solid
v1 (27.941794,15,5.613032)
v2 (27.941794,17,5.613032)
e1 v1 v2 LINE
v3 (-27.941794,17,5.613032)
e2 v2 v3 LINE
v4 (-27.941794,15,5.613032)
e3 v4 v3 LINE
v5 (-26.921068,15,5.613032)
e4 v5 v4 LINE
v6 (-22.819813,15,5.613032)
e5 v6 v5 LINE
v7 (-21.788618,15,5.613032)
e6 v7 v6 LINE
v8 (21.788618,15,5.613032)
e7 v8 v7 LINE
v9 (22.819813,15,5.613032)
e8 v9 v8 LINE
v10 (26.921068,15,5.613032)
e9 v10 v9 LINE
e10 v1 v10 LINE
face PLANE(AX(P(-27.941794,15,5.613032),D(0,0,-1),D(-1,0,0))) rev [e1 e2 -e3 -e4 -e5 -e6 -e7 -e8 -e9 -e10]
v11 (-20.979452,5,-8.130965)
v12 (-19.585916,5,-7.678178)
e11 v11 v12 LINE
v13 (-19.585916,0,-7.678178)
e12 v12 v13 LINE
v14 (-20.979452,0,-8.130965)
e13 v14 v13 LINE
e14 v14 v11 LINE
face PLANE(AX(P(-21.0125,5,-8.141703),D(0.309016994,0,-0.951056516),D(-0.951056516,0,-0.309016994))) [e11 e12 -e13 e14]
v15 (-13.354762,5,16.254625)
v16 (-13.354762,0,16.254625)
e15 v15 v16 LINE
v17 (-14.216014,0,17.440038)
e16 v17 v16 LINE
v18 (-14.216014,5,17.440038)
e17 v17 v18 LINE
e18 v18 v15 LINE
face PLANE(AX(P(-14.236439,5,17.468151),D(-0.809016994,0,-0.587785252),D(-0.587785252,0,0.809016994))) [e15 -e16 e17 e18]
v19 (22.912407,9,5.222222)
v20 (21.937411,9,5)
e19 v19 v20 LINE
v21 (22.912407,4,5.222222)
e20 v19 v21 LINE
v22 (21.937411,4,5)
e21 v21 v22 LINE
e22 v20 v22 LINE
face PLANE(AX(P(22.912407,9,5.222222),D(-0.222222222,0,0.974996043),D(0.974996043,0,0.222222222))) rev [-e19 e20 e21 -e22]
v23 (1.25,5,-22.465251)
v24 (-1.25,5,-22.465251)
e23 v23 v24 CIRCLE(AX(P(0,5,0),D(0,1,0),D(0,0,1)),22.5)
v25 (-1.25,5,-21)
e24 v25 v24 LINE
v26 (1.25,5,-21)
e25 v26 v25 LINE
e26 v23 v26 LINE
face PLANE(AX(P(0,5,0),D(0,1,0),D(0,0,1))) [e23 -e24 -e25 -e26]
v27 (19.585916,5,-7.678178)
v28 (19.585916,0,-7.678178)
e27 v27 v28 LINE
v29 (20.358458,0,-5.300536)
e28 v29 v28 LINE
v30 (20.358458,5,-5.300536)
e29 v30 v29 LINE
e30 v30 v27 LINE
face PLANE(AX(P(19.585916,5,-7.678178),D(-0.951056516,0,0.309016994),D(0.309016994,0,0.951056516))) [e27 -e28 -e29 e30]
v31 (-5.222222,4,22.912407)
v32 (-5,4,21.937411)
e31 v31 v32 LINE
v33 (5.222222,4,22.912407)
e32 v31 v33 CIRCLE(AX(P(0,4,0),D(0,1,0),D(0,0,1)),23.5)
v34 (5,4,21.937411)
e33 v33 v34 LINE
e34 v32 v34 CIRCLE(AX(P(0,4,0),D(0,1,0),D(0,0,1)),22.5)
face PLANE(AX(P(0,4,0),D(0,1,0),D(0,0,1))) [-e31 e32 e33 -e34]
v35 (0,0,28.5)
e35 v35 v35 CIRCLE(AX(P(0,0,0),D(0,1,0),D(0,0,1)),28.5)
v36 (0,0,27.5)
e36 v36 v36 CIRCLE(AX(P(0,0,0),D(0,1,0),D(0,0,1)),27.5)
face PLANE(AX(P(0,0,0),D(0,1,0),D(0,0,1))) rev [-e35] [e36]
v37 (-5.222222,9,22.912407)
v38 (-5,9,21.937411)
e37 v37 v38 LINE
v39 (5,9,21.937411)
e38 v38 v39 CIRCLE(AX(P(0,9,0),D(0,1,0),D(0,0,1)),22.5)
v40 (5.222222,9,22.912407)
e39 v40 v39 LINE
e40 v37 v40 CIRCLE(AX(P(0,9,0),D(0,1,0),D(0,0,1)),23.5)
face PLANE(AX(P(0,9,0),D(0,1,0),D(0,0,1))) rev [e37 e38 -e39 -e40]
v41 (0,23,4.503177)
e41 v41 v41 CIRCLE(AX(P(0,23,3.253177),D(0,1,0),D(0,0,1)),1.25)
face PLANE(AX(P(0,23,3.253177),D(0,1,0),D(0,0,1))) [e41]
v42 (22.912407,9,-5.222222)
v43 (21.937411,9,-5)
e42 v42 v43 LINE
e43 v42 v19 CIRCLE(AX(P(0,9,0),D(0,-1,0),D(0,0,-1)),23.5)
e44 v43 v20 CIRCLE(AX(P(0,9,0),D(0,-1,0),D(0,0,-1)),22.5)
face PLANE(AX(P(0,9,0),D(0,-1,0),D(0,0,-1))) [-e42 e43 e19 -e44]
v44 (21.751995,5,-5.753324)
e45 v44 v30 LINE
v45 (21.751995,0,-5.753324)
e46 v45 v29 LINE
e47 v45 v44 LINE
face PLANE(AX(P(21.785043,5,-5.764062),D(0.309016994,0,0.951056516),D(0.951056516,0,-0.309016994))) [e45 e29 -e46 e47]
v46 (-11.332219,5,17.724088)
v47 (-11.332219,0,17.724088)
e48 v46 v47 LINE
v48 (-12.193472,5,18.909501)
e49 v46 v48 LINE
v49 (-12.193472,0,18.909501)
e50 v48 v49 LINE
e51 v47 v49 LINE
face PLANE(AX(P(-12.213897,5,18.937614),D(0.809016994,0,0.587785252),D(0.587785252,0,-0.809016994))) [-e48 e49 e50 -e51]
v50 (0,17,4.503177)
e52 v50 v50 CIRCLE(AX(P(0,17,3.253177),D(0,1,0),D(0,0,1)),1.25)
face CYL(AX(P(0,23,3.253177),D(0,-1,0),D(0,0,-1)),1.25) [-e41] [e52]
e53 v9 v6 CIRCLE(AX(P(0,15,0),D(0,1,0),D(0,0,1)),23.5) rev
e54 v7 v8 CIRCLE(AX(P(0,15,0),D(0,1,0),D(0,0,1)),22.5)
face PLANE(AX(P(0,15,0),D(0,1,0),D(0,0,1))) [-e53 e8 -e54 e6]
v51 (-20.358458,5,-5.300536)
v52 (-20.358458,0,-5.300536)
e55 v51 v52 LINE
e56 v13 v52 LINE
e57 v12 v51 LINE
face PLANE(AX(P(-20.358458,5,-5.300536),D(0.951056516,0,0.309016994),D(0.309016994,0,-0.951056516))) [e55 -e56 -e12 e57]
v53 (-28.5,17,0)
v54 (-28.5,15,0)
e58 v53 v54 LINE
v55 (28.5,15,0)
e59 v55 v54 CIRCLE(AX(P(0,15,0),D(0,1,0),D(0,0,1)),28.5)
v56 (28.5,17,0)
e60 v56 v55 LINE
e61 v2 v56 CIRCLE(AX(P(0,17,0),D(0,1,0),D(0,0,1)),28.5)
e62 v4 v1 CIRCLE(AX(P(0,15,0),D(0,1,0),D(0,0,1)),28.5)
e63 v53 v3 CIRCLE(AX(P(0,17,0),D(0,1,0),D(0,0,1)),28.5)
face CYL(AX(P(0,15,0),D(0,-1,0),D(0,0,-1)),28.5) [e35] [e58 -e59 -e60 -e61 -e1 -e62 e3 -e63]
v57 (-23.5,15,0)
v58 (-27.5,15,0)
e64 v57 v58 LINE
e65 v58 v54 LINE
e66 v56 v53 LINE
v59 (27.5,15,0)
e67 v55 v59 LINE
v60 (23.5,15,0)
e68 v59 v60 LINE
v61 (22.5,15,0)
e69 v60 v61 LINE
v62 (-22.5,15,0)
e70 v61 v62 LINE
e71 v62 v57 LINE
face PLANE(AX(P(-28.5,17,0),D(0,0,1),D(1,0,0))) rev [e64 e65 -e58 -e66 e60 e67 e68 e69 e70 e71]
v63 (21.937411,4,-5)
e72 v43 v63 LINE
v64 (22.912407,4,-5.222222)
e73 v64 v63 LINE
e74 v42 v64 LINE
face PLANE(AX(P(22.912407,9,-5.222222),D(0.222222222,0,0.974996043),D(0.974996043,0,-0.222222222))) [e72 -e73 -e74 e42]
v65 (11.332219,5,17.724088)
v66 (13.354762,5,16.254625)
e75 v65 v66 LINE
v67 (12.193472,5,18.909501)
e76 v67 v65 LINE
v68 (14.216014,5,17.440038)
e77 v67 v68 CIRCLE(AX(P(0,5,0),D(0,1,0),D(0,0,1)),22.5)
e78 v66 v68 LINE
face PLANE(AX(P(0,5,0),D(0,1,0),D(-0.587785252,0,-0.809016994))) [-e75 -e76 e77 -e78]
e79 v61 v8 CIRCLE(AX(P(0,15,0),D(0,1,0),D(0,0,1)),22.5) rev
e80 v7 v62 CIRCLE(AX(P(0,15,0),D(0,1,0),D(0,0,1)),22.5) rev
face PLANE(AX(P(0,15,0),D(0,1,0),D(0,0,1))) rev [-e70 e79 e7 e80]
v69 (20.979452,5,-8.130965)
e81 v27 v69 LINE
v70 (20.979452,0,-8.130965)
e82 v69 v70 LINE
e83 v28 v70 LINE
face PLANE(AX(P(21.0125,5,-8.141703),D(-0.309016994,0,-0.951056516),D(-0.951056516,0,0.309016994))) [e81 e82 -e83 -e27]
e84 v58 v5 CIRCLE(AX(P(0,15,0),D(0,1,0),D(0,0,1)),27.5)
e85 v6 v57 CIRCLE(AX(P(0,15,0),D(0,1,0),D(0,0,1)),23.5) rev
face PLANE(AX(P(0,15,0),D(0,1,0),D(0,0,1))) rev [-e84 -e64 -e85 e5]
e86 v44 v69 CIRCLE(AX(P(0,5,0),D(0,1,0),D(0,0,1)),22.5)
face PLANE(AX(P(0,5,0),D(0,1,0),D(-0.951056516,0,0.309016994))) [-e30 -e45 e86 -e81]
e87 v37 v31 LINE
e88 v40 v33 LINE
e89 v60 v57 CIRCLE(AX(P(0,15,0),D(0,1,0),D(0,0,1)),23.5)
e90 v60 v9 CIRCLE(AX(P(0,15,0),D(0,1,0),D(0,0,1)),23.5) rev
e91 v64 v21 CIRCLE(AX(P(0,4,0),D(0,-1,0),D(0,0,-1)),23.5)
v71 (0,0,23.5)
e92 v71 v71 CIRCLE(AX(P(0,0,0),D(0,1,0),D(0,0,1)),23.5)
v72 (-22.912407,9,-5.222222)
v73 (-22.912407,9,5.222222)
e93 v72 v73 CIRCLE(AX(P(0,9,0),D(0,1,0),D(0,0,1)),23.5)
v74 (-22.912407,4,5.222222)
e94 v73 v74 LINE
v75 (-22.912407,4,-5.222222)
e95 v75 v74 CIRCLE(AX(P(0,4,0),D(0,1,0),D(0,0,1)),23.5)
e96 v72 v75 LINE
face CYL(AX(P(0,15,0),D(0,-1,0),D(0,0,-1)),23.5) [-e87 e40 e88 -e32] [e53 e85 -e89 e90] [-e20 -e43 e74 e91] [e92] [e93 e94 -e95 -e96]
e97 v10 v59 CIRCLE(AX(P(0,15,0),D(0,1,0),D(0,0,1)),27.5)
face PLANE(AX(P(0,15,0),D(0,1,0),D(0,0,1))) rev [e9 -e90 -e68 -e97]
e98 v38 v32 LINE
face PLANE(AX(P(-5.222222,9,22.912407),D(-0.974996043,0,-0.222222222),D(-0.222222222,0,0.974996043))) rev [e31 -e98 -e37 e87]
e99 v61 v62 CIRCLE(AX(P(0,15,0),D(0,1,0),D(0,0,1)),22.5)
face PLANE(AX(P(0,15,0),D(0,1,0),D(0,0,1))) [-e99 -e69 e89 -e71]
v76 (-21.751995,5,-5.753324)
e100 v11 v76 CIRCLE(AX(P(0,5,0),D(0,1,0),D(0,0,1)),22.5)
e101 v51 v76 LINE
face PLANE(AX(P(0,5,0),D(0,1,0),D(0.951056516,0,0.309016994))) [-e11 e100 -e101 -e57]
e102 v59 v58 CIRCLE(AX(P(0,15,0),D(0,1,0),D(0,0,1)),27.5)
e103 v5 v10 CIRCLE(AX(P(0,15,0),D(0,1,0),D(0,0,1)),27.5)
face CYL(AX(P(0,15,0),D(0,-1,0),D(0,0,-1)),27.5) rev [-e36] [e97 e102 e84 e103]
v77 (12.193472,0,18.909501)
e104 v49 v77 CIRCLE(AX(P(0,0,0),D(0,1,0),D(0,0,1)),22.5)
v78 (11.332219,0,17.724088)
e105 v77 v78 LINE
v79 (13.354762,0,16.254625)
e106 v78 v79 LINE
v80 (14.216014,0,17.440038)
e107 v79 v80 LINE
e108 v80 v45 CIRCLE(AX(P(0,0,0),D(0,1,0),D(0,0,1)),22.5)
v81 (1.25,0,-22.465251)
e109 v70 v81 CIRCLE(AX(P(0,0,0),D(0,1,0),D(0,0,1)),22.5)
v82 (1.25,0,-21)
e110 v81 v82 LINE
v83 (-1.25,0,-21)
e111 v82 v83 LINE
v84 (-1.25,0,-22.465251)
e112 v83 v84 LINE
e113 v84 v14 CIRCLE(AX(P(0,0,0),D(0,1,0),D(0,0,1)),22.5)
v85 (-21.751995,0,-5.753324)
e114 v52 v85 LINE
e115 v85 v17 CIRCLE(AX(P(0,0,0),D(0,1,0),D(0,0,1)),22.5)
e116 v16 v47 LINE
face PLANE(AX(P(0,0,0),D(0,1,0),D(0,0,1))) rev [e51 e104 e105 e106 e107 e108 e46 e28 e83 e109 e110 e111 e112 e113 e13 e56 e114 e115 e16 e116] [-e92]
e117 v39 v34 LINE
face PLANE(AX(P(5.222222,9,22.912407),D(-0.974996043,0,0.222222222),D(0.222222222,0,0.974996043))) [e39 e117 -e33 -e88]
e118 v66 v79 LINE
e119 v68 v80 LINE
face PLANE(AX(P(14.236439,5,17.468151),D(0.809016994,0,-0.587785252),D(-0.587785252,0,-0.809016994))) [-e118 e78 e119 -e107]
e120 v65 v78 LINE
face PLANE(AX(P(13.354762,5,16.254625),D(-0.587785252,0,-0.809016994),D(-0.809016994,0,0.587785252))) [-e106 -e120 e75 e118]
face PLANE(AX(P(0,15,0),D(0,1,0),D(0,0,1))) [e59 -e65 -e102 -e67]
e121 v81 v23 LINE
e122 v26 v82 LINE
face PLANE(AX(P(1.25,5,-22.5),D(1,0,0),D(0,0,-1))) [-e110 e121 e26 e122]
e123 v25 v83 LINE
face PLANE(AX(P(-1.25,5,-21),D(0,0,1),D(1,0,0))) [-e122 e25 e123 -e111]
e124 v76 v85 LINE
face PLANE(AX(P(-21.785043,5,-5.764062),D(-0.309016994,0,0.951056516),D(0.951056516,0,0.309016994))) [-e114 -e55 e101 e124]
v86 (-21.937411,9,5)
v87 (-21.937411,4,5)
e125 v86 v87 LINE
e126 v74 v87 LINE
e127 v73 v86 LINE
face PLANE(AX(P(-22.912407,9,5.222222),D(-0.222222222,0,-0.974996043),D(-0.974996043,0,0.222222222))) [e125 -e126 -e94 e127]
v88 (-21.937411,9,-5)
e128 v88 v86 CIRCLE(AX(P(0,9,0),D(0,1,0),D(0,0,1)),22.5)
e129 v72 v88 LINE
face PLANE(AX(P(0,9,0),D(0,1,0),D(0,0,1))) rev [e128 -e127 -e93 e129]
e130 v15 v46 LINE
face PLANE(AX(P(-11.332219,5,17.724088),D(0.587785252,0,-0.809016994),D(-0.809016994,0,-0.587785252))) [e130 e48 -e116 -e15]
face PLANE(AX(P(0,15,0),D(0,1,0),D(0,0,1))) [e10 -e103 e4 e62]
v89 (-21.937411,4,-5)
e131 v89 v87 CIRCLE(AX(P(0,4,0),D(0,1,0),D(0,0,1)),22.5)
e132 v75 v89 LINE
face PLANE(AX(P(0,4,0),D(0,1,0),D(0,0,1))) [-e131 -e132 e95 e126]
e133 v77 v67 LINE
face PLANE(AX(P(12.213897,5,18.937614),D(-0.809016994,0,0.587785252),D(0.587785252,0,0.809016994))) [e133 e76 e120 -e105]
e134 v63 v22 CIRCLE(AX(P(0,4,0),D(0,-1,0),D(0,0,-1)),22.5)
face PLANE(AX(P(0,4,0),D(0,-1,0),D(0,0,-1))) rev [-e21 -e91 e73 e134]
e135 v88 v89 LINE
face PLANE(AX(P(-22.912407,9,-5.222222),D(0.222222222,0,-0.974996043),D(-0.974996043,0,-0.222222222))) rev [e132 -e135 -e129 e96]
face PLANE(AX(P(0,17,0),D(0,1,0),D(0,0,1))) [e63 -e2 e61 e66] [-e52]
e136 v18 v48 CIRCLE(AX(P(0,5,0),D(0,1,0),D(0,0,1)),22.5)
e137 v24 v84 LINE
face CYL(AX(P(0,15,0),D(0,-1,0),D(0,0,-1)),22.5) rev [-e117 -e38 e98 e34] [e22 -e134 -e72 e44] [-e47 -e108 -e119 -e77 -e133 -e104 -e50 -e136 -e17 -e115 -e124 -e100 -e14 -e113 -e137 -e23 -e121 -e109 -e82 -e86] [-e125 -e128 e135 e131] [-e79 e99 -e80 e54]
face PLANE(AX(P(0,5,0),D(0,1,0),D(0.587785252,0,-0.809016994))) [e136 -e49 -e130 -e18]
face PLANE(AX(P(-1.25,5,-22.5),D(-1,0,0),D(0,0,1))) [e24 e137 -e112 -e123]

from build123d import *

# Parameters (mm, degrees)
SKETCH1_R             = 23.5
SKETCH1_R_2           = 22.5
BOSS_EXTRUDE1_DEPTH   = 15
SKETCH1_R_3           = 28.5
SKETCH1_R_4           = 27.5
BOSS_EXTRUDE1_2_DEPTH = 15
CUT_EXTRUDE2_DEPTH    = 5
BOSS_EXTRUDE3_DEPTH   = 2
SKETCH5_R             = 1.25
BOSS_EXTRUDE4_DEPTH   = 6
CUT_EXTRUDE3_START    = -2
CUT_EXTRUDE3_DEPTH    = 2
SKETCH7_W             = 2.5
SKETCH7_H             = 1.5
BOSS_EXTRUDE5_DEPTH   = 5
CIRPATTERN1_COUNT     = 5


with BuildPart() as part:
    # Sketch1 → Boss-Extrude1 (new body)
    with BuildSketch(Plane(origin=(0, 0, 0), x_dir=(1, 0, 0), z_dir=(0, 1, 0))):
        Circle(SKETCH1_R)
        Circle(SKETCH1_R_2, mode=Mode.SUBTRACT)
    extrude(amount=BOSS_EXTRUDE1_DEPTH)

    # Sketch4 → Cut-Extrude2 (cut)
    with BuildSketch(Plane(origin=(0, 4, 0), x_dir=(-1, 0, 0), z_dir=(0, -1, 0))):
        with BuildLine():
            Line((22.912407012, 5.222222222), (21.937410968, 5))
            ThreePointArc((21.937410968, 5), (22.5, 0), (21.937410968, -5))
            Line((21.937410968, -5), (22.912407012, -5.222222222))
            ThreePointArc((22.912407012, -5.222222222), (23.5, 0), (22.912407012, 5.222222222))
        make_face()
        with BuildLine():
            Line((-22.912407012, -5.222222222), (-21.937410968, -5))
            ThreePointArc((-21.937410968, -5), (-22.5, 0), (-21.937410968, 5))
            Line((-21.937410968, 5), (-22.912407012, 5.222222222))
            ThreePointArc((-22.912407012, 5.222222222), (-23.5, 0), (-22.912407012, -5.222222222))
        make_face()
        with BuildLine():
            Line((-5.222222222, -22.912407012), (-5, -21.937410968))
            ThreePointArc((-5, -21.937410968), (0, -22.5), (5, -21.937410968))
            Line((5, -21.937410968), (5.222222222, -22.912407012))
            ThreePointArc((5.222222222, -22.912407012), (0, -23.5), (-5.222222222, -22.912407012))
        make_face()
    extrude(amount=-CUT_EXTRUDE2_DEPTH, mode=Mode.SUBTRACT)



with BuildPart() as body_2:
    # Sketch1 → Boss-Extrude1 2 (new body)
    with BuildSketch(Plane(origin=(0, 0, 0), x_dir=(1, 0, 0), z_dir=(0, 1, 0))):
        Circle(SKETCH1_R_3)
        Circle(SKETCH1_R_4, mode=Mode.SUBTRACT)
    extrude(amount=BOSS_EXTRUDE1_2_DEPTH)


with BuildPart() as part_1:
    add(part.part)

    add(body_2.part)  # Boss-Extrude3 merges body 2
    # Sketch3 → Boss-Extrude3 (add)
    with BuildSketch(Plane(origin=(0, 15, 0), x_dir=(1, 0, 0), z_dir=(0, 1, 0))):
        with BuildLine():
            Line((-28.5, 0), (28.5, 0))
            ThreePointArc((28.5, 0), (0, -28.5), (-28.5, 0))
        make_face()
    extrude(amount=BOSS_EXTRUDE3_DEPTH)

    # Sketch5 → Boss-Extrude4 (add)
    with BuildSketch(Plane(origin=(0, 17, 0), x_dir=(1, 0, 0), z_dir=(0, 1, 0))):
        with Locations((0, -3.253176926)):
            Circle(SKETCH5_R)
    extrude(amount=BOSS_EXTRUDE4_DEPTH)

    # Sketch6 → Cut-Extrude3 (cut)
    with BuildSketch(Plane(origin=(0, 17, 0), x_dir=(1, 0, 0), z_dir=(0, 1, 0)).offset(CUT_EXTRUDE3_START)):
        with BuildLine():
            Line((-27.941794444, -5.613031555), (27.941794444, -5.613031555))
            ThreePointArc((27.941794444, -5.613031555), (0, -28.5), (-27.941794444, -5.613031555))
        make_face()
    extrude(amount=CUT_EXTRUDE3_DEPTH, mode=Mode.SUBTRACT)

    # Sketch7 → Boss-Extrude5 (add)
    with BuildSketch(Plane.XZ):
        with Locations((0, -21.75)):
            Rectangle(SKETCH7_W, SKETCH7_H)
    boss_extrude5 = extrude(amount=-BOSS_EXTRUDE5_DEPTH)

    # CirPattern1: Boss-Extrude5 ×5 about axis
    cirpattern1_axis = Axis((0, 0, 0), (0, 1, 0))
    for i in range(1, CIRPATTERN1_COUNT):
        add(boss_extrude5.rotate(cirpattern1_axis, i * 360 / CIRPATTERN1_COUNT))


solid = part_1.part
